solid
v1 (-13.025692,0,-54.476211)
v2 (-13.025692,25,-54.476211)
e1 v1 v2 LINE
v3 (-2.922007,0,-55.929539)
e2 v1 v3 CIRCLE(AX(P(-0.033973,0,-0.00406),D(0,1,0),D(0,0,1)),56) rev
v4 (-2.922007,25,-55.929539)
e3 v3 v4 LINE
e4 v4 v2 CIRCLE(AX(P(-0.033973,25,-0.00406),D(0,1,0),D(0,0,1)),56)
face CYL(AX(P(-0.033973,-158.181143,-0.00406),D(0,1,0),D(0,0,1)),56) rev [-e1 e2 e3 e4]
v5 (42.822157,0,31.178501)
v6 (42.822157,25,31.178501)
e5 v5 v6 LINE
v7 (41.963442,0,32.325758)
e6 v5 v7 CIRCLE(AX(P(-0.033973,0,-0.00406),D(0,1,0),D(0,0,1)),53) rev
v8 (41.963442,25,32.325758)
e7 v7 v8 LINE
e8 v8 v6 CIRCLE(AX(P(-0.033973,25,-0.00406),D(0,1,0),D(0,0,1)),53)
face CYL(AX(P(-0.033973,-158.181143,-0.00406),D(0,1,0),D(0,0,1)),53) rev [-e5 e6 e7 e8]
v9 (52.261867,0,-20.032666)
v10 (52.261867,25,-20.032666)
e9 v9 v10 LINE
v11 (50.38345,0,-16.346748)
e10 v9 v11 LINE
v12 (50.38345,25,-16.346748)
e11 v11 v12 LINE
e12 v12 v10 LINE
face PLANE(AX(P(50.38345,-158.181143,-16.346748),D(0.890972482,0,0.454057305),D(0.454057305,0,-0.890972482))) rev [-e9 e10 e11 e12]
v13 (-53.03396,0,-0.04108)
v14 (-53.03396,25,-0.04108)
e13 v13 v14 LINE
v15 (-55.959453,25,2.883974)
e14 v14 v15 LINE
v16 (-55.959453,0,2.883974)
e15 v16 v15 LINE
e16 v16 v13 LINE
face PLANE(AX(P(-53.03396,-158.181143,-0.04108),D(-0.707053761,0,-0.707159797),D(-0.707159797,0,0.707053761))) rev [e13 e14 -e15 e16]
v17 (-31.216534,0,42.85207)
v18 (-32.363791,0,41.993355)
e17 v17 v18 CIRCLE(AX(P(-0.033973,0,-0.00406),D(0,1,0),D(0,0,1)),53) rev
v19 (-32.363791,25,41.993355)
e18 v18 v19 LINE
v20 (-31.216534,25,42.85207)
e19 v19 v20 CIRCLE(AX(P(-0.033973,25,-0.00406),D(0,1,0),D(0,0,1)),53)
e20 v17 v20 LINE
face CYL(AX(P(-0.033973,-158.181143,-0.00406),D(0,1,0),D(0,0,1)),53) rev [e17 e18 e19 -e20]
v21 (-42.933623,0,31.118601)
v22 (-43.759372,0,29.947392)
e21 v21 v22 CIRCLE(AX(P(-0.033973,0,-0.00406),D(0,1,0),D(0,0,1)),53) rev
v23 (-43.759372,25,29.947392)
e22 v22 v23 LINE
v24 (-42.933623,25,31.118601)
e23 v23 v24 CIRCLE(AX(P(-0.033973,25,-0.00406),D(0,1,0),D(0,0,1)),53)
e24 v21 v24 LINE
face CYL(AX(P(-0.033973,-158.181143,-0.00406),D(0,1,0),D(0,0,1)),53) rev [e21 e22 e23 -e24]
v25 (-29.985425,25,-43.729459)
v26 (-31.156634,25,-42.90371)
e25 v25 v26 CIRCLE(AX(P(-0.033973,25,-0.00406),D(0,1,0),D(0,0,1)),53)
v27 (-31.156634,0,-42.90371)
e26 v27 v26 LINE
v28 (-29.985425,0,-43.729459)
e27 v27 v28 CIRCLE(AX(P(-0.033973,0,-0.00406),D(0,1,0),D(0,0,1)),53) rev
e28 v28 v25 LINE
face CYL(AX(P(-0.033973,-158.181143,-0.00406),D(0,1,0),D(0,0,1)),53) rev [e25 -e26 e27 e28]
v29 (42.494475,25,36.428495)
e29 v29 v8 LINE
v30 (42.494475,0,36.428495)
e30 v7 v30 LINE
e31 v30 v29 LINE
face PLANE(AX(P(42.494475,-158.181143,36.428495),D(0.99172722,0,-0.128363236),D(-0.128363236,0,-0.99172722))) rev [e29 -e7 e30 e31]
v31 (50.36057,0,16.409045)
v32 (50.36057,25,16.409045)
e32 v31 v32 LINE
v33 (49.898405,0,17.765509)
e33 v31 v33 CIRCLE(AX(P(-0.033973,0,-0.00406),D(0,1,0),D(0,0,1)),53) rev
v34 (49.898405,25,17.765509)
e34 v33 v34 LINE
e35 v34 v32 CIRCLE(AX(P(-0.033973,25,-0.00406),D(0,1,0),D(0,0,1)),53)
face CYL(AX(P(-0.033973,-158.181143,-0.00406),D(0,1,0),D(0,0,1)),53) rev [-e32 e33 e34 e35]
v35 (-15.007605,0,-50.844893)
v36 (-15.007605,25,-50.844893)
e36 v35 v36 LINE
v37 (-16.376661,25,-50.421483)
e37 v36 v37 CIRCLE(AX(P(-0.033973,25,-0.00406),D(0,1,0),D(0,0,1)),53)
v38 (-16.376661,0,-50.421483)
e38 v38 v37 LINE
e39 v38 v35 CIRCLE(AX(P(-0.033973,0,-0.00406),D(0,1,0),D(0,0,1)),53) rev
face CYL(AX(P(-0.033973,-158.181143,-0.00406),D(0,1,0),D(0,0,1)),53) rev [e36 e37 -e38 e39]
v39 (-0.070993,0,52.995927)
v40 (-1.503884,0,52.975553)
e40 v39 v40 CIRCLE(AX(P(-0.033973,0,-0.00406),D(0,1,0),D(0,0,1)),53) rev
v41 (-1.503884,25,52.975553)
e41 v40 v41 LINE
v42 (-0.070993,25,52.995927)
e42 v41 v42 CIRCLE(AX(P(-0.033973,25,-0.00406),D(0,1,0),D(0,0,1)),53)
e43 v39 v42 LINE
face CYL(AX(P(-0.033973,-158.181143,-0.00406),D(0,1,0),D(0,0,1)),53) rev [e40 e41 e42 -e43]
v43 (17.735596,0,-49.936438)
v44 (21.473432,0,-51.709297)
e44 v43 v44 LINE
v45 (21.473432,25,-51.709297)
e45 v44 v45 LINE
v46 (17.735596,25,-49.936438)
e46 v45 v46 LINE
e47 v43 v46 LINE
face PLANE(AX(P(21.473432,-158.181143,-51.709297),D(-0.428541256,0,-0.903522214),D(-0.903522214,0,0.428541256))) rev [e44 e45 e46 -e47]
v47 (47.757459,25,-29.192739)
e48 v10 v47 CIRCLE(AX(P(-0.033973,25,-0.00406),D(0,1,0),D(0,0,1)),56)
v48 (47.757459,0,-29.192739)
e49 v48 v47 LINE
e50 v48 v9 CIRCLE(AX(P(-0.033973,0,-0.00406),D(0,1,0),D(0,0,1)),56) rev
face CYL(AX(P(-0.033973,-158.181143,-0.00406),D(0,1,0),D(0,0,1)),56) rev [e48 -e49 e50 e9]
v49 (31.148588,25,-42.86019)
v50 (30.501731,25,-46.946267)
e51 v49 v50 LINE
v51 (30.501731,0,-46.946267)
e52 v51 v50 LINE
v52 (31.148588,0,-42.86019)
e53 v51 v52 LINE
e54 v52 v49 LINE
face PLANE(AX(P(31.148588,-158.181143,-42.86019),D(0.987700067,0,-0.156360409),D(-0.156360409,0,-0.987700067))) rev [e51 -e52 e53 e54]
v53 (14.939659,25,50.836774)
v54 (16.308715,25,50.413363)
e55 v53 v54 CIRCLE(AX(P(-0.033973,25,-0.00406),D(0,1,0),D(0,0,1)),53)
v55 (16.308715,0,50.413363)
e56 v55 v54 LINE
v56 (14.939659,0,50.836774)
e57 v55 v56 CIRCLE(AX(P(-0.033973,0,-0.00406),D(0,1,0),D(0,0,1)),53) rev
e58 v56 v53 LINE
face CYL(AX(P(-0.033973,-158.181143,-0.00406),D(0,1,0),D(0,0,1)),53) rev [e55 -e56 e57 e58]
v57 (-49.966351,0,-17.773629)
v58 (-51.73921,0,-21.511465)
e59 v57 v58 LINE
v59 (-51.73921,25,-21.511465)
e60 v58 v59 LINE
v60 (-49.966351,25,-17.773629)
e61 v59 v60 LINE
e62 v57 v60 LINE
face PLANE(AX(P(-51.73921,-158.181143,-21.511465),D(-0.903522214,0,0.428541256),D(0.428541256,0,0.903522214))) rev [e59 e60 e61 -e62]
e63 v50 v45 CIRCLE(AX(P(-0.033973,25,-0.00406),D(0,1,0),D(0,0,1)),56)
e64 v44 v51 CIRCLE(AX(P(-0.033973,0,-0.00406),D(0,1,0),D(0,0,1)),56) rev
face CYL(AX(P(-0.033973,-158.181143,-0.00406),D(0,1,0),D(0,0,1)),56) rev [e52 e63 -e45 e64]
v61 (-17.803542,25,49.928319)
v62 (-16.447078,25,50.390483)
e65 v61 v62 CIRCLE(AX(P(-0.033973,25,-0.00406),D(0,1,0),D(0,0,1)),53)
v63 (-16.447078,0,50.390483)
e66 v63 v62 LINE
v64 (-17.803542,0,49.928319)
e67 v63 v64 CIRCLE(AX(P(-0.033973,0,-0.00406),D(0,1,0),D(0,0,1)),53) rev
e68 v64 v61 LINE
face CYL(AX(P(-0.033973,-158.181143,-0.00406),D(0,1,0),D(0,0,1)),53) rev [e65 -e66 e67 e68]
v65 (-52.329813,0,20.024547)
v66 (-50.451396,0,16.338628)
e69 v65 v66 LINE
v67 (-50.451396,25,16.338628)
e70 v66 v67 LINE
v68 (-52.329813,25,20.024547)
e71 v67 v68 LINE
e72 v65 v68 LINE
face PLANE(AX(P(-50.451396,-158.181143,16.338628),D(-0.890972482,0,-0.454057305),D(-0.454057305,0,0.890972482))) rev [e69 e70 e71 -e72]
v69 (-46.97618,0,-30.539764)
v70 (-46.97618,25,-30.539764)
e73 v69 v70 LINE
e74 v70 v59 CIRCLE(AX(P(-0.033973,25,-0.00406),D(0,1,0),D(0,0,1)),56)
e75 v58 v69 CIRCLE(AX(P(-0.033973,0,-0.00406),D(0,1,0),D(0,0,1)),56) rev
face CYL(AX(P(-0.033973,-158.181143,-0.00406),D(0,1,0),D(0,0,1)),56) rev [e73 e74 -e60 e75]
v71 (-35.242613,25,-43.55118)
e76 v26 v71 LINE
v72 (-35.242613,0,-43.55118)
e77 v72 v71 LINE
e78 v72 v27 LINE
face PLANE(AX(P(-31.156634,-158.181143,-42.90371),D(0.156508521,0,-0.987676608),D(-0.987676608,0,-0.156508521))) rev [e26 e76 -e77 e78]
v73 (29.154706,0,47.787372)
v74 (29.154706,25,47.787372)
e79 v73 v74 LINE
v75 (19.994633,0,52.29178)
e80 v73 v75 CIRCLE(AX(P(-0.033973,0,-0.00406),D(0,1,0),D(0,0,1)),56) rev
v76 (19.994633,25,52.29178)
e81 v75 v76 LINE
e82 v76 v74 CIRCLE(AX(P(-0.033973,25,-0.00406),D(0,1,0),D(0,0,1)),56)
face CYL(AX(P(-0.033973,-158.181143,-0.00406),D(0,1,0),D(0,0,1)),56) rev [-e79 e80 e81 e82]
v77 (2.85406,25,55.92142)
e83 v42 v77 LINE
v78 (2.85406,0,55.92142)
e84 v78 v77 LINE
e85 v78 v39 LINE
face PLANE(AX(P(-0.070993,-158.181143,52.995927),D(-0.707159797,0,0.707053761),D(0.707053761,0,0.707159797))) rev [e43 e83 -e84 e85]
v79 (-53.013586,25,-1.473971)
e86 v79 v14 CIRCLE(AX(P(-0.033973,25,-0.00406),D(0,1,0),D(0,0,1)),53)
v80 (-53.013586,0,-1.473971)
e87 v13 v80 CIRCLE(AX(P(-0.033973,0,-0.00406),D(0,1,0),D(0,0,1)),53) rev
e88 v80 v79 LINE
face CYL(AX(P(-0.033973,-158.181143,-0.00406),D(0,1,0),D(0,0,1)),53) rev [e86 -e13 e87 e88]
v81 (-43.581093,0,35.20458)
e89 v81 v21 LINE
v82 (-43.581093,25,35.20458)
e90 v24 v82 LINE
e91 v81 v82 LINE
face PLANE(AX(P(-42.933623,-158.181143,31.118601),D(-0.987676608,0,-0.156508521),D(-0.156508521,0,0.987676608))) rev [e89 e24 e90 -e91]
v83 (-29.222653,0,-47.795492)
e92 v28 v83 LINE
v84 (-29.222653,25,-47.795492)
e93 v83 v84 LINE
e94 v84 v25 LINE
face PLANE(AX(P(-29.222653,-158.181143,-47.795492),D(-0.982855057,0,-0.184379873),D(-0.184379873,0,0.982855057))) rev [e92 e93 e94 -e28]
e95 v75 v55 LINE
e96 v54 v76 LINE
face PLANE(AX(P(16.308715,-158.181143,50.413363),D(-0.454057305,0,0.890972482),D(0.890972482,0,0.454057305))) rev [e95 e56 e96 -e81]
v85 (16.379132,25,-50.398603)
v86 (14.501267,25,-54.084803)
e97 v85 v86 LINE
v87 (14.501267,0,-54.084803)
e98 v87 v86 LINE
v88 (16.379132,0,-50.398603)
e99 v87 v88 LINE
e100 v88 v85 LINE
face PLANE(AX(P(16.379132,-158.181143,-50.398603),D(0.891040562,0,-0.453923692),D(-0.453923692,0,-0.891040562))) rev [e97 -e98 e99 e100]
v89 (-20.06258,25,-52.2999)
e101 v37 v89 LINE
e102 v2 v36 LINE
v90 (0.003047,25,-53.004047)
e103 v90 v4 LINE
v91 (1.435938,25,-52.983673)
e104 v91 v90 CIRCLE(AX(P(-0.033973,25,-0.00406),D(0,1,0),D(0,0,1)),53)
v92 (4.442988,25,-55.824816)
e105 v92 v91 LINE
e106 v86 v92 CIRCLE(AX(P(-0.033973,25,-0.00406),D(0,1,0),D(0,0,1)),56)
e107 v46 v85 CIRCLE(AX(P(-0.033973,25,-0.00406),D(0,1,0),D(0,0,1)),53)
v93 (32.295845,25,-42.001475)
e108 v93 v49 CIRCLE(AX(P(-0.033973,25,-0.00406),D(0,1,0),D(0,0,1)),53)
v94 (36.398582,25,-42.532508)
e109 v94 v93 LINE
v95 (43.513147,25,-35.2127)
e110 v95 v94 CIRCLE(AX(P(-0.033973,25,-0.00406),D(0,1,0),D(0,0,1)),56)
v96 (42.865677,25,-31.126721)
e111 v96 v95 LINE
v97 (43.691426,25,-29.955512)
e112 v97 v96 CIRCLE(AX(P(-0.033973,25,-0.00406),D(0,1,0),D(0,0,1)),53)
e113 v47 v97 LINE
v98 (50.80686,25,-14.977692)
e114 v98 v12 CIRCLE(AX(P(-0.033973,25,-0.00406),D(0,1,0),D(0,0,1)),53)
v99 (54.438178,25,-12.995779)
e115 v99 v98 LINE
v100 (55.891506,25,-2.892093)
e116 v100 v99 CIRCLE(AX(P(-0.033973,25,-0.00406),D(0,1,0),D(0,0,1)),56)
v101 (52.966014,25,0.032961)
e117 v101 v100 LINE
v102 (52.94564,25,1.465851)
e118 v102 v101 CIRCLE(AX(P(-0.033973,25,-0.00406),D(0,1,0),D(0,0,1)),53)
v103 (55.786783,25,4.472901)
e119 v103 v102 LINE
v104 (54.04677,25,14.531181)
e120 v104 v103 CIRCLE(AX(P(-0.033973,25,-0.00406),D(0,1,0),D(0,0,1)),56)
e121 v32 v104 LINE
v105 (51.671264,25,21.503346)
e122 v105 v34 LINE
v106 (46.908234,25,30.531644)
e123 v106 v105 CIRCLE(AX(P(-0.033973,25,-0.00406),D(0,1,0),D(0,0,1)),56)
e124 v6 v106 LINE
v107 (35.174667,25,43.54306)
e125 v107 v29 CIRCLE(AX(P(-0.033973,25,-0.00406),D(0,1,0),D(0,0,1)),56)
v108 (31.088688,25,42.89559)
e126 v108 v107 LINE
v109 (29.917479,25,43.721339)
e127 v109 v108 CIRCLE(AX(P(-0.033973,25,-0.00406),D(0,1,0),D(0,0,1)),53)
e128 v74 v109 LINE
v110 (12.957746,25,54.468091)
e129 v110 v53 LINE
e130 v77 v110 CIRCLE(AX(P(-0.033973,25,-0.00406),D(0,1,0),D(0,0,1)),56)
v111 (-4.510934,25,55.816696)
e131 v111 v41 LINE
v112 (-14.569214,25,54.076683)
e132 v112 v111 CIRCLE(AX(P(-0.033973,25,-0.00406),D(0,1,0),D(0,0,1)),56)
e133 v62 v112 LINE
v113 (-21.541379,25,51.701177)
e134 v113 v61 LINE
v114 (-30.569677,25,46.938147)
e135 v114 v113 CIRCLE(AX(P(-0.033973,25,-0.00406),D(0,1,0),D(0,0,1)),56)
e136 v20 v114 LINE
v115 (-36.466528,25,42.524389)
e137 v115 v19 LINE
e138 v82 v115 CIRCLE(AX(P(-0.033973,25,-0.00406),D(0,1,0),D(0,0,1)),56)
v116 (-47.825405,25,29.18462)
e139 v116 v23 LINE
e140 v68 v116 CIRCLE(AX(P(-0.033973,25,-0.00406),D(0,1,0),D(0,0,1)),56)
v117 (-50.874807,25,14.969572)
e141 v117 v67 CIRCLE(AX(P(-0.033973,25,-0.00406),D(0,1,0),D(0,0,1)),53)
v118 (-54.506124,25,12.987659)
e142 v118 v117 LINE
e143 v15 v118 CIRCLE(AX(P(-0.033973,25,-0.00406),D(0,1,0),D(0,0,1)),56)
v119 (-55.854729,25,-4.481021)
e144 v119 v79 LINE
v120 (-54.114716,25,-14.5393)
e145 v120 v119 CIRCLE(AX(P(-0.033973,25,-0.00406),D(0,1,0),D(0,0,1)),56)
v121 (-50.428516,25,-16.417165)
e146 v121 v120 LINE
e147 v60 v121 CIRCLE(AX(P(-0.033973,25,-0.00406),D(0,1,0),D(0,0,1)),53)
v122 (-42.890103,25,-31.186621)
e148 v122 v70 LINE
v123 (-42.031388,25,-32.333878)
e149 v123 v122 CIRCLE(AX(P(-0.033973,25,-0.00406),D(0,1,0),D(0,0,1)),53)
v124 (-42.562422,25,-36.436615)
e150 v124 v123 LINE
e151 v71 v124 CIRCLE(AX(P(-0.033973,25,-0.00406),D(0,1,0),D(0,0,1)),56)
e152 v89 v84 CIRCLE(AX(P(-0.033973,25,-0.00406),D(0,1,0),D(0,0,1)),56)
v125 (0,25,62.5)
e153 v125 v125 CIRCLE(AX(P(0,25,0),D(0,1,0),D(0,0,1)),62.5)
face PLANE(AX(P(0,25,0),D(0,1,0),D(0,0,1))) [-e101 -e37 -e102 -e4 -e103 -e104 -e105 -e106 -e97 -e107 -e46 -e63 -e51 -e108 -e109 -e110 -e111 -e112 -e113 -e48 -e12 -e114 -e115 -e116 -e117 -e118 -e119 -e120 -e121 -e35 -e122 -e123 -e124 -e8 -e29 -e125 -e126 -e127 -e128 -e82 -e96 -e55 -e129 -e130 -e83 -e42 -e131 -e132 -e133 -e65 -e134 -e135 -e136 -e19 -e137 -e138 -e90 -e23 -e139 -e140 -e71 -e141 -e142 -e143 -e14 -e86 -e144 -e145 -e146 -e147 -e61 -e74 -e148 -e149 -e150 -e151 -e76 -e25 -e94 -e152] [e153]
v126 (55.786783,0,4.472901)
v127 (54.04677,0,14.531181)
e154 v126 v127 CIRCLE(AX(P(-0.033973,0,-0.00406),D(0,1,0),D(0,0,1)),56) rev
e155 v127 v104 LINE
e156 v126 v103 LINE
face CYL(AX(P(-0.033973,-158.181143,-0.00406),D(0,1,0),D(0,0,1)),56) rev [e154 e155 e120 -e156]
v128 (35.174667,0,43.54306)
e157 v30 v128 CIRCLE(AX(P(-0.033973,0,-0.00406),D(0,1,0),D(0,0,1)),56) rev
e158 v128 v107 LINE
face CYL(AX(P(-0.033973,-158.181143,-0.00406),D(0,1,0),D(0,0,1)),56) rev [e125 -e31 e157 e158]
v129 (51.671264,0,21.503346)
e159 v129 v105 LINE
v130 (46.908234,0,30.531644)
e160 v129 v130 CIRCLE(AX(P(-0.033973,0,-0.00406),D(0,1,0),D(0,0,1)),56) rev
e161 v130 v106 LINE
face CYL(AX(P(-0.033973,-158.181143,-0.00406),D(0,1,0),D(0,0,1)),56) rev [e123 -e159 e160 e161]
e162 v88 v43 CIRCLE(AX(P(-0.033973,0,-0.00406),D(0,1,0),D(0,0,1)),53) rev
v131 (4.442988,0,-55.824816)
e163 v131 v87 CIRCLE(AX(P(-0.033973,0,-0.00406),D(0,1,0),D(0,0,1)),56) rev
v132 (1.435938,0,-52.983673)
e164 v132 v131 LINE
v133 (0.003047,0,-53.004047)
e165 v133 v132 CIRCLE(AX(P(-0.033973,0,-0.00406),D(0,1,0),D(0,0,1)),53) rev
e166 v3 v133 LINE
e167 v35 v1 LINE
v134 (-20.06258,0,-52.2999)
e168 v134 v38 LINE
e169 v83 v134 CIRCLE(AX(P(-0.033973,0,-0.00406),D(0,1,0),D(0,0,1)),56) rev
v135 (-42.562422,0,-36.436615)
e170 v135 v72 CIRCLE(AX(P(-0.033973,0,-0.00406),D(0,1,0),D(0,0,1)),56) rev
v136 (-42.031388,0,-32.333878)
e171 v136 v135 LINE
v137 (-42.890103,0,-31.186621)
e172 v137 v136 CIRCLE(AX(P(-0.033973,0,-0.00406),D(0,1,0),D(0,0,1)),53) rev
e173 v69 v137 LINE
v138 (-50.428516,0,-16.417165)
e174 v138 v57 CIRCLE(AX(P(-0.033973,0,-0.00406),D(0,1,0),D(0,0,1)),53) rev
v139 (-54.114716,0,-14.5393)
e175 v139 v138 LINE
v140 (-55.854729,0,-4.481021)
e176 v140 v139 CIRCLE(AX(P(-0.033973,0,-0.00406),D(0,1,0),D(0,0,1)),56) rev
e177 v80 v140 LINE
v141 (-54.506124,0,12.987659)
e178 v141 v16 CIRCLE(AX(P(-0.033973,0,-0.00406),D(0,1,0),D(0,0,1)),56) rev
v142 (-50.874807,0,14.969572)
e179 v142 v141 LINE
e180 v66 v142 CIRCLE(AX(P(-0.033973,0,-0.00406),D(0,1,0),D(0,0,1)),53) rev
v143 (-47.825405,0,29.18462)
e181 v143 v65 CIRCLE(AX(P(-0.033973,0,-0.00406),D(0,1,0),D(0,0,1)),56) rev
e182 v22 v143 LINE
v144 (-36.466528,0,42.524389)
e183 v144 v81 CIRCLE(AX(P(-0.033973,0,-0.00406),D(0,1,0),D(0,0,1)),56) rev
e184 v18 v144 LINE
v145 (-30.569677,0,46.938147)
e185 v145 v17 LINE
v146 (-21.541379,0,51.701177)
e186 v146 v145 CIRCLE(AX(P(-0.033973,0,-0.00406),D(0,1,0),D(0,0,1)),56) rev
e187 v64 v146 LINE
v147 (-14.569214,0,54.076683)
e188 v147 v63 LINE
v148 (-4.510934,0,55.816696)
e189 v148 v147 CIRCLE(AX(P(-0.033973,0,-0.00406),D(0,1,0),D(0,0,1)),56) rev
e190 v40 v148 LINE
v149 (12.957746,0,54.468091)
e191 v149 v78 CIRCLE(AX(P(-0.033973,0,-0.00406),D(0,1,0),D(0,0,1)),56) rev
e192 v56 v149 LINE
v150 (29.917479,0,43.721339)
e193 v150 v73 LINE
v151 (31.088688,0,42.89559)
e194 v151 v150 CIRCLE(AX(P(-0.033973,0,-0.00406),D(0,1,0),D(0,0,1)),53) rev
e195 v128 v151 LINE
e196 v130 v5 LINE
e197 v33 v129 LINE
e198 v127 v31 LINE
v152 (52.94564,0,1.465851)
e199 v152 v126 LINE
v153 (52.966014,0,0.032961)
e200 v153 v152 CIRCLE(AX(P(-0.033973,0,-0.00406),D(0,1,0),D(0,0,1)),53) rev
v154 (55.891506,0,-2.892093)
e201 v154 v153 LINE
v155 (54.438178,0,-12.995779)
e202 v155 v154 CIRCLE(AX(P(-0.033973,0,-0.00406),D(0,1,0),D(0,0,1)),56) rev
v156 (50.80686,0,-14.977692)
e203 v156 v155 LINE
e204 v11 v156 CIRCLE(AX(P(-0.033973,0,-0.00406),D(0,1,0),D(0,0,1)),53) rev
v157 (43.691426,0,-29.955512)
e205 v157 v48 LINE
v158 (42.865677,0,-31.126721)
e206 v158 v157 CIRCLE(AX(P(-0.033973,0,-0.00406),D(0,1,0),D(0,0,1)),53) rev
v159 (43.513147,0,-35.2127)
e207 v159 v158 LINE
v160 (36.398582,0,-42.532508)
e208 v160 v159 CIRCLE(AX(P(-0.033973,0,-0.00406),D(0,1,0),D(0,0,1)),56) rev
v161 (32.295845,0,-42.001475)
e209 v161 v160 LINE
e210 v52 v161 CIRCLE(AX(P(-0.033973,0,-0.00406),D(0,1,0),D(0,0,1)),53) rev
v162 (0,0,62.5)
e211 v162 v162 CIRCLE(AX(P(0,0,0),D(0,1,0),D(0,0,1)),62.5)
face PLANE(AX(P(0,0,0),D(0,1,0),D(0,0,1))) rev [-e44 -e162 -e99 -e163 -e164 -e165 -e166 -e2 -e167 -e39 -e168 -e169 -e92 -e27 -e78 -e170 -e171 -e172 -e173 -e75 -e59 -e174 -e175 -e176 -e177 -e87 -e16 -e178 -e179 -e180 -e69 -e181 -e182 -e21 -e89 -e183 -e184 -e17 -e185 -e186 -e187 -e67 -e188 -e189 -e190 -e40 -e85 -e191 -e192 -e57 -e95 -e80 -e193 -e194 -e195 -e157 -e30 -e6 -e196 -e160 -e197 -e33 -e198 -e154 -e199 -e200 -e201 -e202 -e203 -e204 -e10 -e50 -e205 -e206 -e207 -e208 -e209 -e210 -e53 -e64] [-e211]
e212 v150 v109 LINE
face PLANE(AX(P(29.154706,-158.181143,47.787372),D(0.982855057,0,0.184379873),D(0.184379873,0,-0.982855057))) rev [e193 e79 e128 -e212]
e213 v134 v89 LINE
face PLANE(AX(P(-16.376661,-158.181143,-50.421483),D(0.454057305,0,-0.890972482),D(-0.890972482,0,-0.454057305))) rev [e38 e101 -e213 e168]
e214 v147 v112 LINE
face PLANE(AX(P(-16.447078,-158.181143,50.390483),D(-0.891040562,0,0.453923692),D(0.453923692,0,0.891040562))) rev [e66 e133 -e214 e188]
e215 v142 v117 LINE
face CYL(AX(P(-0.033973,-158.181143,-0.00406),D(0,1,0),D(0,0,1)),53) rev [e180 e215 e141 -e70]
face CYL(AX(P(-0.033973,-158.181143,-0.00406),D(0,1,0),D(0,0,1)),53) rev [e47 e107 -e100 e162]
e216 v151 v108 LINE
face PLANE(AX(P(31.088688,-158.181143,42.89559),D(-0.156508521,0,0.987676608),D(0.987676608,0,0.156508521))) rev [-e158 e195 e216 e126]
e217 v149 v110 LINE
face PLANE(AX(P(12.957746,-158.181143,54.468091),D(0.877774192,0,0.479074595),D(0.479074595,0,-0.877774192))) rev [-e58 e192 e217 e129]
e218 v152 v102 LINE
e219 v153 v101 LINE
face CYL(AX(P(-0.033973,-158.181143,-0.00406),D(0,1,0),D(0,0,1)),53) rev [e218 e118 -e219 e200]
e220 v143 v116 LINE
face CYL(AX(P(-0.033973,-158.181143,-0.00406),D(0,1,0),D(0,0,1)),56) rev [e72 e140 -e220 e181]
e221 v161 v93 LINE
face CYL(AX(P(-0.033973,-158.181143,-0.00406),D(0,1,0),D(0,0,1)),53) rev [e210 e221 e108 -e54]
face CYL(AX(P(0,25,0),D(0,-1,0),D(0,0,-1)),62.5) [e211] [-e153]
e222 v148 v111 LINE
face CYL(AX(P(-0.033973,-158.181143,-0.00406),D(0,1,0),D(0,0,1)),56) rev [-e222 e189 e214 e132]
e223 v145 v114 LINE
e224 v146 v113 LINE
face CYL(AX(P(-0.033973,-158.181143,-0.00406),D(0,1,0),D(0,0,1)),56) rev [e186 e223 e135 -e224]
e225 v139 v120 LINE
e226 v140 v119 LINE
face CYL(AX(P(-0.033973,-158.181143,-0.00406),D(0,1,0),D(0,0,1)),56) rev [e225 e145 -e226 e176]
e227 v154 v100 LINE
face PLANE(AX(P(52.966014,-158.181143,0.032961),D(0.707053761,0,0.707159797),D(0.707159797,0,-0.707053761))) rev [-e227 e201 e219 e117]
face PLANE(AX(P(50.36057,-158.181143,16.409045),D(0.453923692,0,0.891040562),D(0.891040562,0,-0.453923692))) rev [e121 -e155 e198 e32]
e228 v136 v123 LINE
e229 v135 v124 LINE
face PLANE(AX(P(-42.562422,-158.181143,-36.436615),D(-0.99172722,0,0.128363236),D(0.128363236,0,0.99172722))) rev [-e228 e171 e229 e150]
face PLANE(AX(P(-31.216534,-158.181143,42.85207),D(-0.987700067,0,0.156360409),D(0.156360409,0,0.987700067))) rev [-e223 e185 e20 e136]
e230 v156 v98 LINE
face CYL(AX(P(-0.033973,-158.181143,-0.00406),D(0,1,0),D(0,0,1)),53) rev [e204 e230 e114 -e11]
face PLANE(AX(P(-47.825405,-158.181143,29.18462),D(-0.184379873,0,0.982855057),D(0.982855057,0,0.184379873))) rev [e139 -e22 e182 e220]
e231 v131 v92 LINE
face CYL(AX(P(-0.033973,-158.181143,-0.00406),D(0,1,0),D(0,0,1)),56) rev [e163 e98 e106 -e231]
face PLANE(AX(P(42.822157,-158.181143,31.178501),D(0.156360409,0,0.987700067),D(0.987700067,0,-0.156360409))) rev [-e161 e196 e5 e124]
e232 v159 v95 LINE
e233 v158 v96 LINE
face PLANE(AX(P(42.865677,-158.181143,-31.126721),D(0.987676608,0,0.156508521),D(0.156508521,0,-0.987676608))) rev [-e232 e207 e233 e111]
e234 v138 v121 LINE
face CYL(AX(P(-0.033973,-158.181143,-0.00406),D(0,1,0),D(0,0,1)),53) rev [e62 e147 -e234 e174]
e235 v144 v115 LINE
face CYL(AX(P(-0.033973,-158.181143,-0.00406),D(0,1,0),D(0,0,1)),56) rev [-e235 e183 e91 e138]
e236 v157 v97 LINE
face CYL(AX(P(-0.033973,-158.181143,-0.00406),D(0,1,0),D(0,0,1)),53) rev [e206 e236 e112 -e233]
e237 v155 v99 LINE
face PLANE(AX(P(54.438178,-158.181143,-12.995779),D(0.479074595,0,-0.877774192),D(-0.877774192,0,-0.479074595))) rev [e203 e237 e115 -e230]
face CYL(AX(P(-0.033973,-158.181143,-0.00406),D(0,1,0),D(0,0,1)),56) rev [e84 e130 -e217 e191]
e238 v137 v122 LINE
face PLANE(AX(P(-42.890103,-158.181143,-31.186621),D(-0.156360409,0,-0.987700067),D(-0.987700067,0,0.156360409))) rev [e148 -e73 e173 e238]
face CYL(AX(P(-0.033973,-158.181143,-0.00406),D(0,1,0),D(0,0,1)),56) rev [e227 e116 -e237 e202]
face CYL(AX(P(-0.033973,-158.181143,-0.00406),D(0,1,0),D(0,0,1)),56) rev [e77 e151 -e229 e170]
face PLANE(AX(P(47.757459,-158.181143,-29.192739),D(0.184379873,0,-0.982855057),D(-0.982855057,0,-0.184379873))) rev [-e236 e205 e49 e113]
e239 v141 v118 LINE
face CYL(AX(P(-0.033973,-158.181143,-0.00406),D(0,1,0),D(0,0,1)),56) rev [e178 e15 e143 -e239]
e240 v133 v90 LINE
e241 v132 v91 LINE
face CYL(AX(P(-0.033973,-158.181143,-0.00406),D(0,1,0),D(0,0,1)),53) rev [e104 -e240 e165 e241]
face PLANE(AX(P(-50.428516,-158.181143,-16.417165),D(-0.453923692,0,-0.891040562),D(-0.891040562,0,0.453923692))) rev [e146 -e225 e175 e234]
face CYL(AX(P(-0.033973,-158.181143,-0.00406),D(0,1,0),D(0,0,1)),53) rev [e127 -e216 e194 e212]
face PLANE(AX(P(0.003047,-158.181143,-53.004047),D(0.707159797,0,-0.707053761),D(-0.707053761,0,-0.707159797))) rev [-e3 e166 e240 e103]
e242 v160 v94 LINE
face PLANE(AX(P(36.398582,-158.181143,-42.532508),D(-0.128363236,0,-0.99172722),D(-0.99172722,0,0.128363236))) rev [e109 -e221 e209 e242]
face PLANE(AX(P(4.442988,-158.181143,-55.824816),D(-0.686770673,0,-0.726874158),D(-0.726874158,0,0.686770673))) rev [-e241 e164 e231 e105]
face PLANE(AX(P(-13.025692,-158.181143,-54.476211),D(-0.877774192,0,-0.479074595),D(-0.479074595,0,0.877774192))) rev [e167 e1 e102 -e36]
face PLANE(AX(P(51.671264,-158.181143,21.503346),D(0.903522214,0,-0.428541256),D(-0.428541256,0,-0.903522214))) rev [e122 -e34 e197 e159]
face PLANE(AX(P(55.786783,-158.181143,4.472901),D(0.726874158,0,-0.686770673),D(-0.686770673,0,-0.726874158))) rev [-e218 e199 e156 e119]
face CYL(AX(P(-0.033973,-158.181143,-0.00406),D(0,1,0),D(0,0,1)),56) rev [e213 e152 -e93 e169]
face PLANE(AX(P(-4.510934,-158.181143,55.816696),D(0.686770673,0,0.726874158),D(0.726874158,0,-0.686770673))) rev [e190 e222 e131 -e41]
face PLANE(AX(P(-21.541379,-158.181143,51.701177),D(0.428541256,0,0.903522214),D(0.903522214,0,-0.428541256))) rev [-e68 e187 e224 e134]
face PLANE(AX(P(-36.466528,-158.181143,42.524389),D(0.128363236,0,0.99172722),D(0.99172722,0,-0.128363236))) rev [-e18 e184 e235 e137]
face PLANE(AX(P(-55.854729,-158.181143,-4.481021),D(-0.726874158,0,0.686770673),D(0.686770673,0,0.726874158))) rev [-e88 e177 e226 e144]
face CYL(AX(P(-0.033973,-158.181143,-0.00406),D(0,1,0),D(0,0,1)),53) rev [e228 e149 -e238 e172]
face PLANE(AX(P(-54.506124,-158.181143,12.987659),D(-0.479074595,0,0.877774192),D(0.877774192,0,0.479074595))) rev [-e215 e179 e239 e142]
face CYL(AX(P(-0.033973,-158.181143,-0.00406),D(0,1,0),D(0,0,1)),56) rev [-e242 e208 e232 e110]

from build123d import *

# Parameters (mm, degrees)
SKETCH1_R           = 62.5
BOSS_EXTRUDE1_DEPTH = 25
CAVITY1_DEPTH       = 25
CUT_EXTRUDE1_DEPTH  = 25


# Read off the part's stored shape, not the designer's step: Cavity1
with BuildPart() as part:
    # Sketch1 → Boss-Extrude1 (new body)
    with BuildSketch(Plane(origin=(0, 0, 0), x_dir=(1, 0, 0), z_dir=(0, 1, 0))):
        with Locations(Location((0, 0, 0), (0, 0, 270))):
            Circle(SKETCH1_R)
    extrude(amount=BOSS_EXTRUDE1_DEPTH)

    # Cavity1 outline → Cavity1 (cut)
    with BuildSketch(Plane(origin=(0, 0, 0), x_dir=(1, 0, 0), z_dir=(0, 1, 0))):
        with BuildLine():
            Line((16.350867892, -49.873660473), (20.022970331, -51.745036944))
            ThreePointArc((20.022970331, -51.745036944), (24.456878574, -49.800038203), (28.704396647, -47.476000203))
            Line((28.704396647, -47.476000203), (29.464309883, -43.425207924))
            ThreePointArc((29.464309883, -43.425207924), (30.217762384, -42.903777412), (30.961999914, -42.369276757))
            Line((30.961999914, -42.369276757), (35.032663999, -43.014319485))
            ThreePointArc((35.032663999, -43.014319485), (38.648523661, -39.79436276), (41.969986165, -36.271516008))
            Line((41.969986165, -36.271516008), (41.440942946, -32.18415751))
            ThreePointArc((41.440942946, -32.18415751), (41.996387967, -31.455417996), (42.539030133, -30.717095621))
            Line((42.539030133, -30.717095621), (46.609790903, -30.07266333))
            ThreePointArc((46.609790903, -30.07266333), (49.053656447, -25.89294042), (51.12393549, -21.5161257))
            Line((51.12393549, -21.5161257), (49.357722251, -17.792300112))
            ThreePointArc((49.357722251, -17.792300112), (49.660788964, -16.927585698), (49.94871817, -16.05771374))
            Line((49.94871817, -16.05771374), (53.621101197, -14.186887953))
            ThreePointArc((53.621101197, -14.186887953), (54.653750036, -9.456539258), (55.270192281, -4.654189691))
            Line((55.270192281, -4.654189691), (52.43969828, -1.658411006))
            ThreePointArc((52.43969828, -1.658411006), (52.460720403, -0.742365963), (52.465752134, 0.173906448))
            Line((52.465752134, 0.173906448), (55.380278979, 3.087996269))
            ThreePointArc((55.380278979, 3.087996269), (54.900628251, 7.905931261), (54.002892036, 12.66372824))
            Line((54.002892036, 12.66372824), (50.385185747, 14.63821233))
            ThreePointArc((50.385185747, 14.63821233), (50.122105488, 15.515919131), (49.843747202, 16.388900869))
            Line((49.843747202, 16.388900869), (51.715123672, 20.061003308))
            ThreePointArc((51.715123672, 20.061003308), (49.770124931, 24.49491155), (47.446086932, 28.742429624))
            Line((47.446086932, 28.742429624), (43.395294653, 29.50234286))
            ThreePointArc((43.395294653, 29.50234286), (42.87386414, 30.255795361), (42.339363485, 31.000032891))
            Line((42.339363485, 31.000032891), (42.984406214, 35.070696976))
            ThreePointArc((42.984406214, 35.070696976), (39.764449489, 38.686556638), (36.241602736, 42.008019142))
            Line((36.241602736, 42.008019142), (32.154244239, 41.478975923))
            ThreePointArc((32.154244239, 41.478975923), (31.425504725, 42.034420944), (30.68718235, 42.57706311))
            Line((30.68718235, 42.57706311), (30.042750059, 46.64782388))
            ThreePointArc((30.042750059, 46.64782388), (25.863027148, 49.091689424), (21.486212429, 51.161968467))
            Line((21.486212429, 51.161968467), (17.762386841, 49.395755228))
            ThreePointArc((17.762386841, 49.395755228), (16.897672427, 49.698821941), (16.027800469, 49.986751147))
            Line((16.027800469, 49.986751147), (14.156974682, 53.659134174))
            ThreePointArc((14.156974682, 53.659134174), (9.426625987, 54.691783013), (4.62427642, 55.308225258))
            Line((4.62427642, 55.308225258), (1.628497735, 52.477731257))
            ThreePointArc((1.628497735, 52.477731257), (0.712452692, 52.49875338), (-0.20381972, 52.503785111))
            Line((-0.20381972, 52.503785111), (-3.11790954, 55.418311956))
            ThreePointArc((-3.11790954, 55.418311956), (-7.935844532, 54.938661228), (-12.693641511, 54.040925013))
            Line((-12.693641511, 54.040925013), (-14.668125602, 50.423218724))
            ThreePointArc((-14.668125602, 50.423218724), (-15.545832402, 50.160138465), (-16.41881414, 49.881780179))
            Line((-16.41881414, 49.881780179), (-20.090916579, 51.753156649))
            ThreePointArc((-20.090916579, 51.753156649), (-24.524824822, 49.808157908), (-28.772342895, 47.484119909))
            Line((-28.772342895, 47.484119909), (-29.532256132, 43.43332763))
            ThreePointArc((-29.532256132, 43.43332763), (-30.285708633, 42.911897117), (-31.029946162, 42.377396462))
            Line((-31.029946162, 42.377396462), (-35.100610248, 43.022439191))
            ThreePointArc((-35.100610248, 43.022439191), (-38.71646991, 39.802482465), (-42.037932414, 36.279635713))
            Line((-42.037932414, 36.279635713), (-41.508889194, 32.192277216))
            ThreePointArc((-41.508889194, 32.192277216), (-42.064334215, 31.463537702), (-42.606976382, 30.725215327))
            Line((-42.606976382, 30.725215327), (-46.677737151, 30.080783036))
            ThreePointArc((-46.677737151, 30.080783036), (-49.121602695, 25.901060125), (-51.191881738, 21.524245406))
            Line((-51.191881738, 21.524245406), (-49.425668499, 17.800419818))
            ThreePointArc((-49.425668499, 17.800419818), (-49.728735212, 16.935705404), (-50.016664419, 16.065833446))
            Line((-50.016664419, 16.065833446), (-53.689047445, 14.195007659))
            ThreePointArc((-53.689047445, 14.195007659), (-54.721696284, 9.464658964), (-55.33813853, 4.662309397))
            Line((-55.33813853, 4.662309397), (-52.507644528, 1.666530712))
            ThreePointArc((-52.507644528, 1.666530712), (-52.528666651, 0.750485669), (-52.533698382, -0.165786743))
            Line((-52.533698382, -0.165786743), (-55.448225228, -3.079876563))
            ThreePointArc((-55.448225228, -3.079876563), (-54.968574499, -7.897811555), (-54.070838284, -12.655608534))
            Line((-54.070838284, -12.655608534), (-50.453131995, -14.630092625))
            ThreePointArc((-50.453131995, -14.630092625), (-50.190051736, -15.507799425), (-49.91169345, -16.380781163))
            Line((-49.91169345, -16.380781163), (-51.783069921, -20.052883602))
            ThreePointArc((-51.783069921, -20.052883602), (-49.83807118, -24.486791845), (-47.51403318, -28.734309918))
            Line((-47.51403318, -28.734309918), (-43.463240901, -29.494223155))
            ThreePointArc((-43.463240901, -29.494223155), (-42.941810389, -30.247675656), (-42.407309734, -30.991913185))
            Line((-42.407309734, -30.991913185), (-43.052352462, -35.062577271))
            ThreePointArc((-43.052352462, -35.062577271), (-39.832395737, -38.678436932), (-36.309548985, -41.999899437))
            Line((-36.309548985, -41.999899437), (-32.222190487, -41.470856217))
            ThreePointArc((-32.222190487, -41.470856217), (-31.493450973, -42.026301238), (-30.755128598, -42.568943405))
            Line((-30.755128598, -42.568943405), (-30.110696307, -46.639704174))
            ThreePointArc((-30.110696307, -46.639704174), (-25.930973397, -49.083569718), (-21.554158677, -51.153848761))
            Line((-21.554158677, -51.153848761), (-17.830333089, -49.387635522))
            ThreePointArc((-17.830333089, -49.387635522), (-16.965618675, -49.690702235), (-16.095746717, -49.978631442))
            Line((-16.095746717, -49.978631442), (-14.22492093, -53.651014468))
            ThreePointArc((-14.22492093, -53.651014468), (-9.494572235, -54.683663307), (-4.692222668, -55.300105553))
            Line((-4.692222668, -55.300105553), (-1.696443983, -52.469611551))
            ThreePointArc((-1.696443983, -52.469611551), (-0.78039894, -52.490633674), (0.135873471, -52.495665405))
            Line((0.135873471, -52.495665405), (3.049963292, -55.410192251))
            ThreePointArc((3.049963292, -55.410192251), (7.867898284, -54.930541522), (12.625695263, -54.032805307))
            Line((12.625695263, -54.032805307), (14.600179353, -50.415099018))
            ThreePointArc((14.600179353, -50.415099018), (15.477886154, -50.152018759), (16.350867892, -49.873660473))
        make_face()
    extrude(amount=CAVITY1_DEPTH, mode=Mode.SUBTRACT)

    # Sketch2 → Cut-Extrude1 (cut)
    with BuildSketch(Plane(origin=(0, 25, 0), x_dir=(1, 0, 0), z_dir=(0, 1, 0))):
        with BuildLine():
            Line((-13.025692309, 54.476210835), (-15.00760521, 50.844893266))
            ThreePointArc((-15.00760521, 50.844893266), (-15.693564395, 50.637815404), (-16.376661363, 50.421482845))
            Line((-16.376661363, 50.421482845), (-20.062579743, 52.299900193))
            ThreePointArc((-20.062579743, 52.299900193), (-24.745463125, 50.256843477), (-29.222652686, 47.795491987))
            Line((-29.222652686, 47.795491987), (-29.985425025, 43.729458982))
            ThreePointArc((-29.985425025, 43.729458982), (-30.573820399, 43.320543187), (-31.156633785, 42.903710124))
            Line((-31.156633785, 42.903710124), (-35.242613361, 43.551179765))
            ThreePointArc((-35.242613361, 43.551179765), (-39.064960871, 40.161026813), (-42.562421739, 36.436614779))
            Line((-42.562421739, 36.436614779), (-42.031388044, 32.333877979))
            ThreePointArc((-42.031388044, 32.333877979), (-42.464623369, 31.763151777), (-42.890103336, 31.186620736))
            Line((-42.890103336, 31.186620736), (-46.976179961, 30.539763829))
            ThreePointArc((-46.976179961, 30.539763829), (-49.563833592, 26.134366434), (-51.739209928, 21.511465254))
            Line((-51.739209928, 21.511465254), (-49.966351477, 17.773629122))
            ThreePointArc((-49.966351477, 17.773629122), (-50.20201866, 17.096959171), (-50.428516267, 16.417165027))
            Line((-50.428516267, 16.417165027), (-54.114716289, 14.539300433))
            ThreePointArc((-54.114716289, 14.539300433), (-55.214378475, 9.549889586), (-55.854729287, 4.481021038))
            Line((-55.854729287, 4.481021038), (-53.013585818, 1.473971017))
            ThreePointArc((-53.013585818, 1.473971017), (-53.028616113, 0.757594486), (-53.033960195, 0.041080226))
            Line((-53.033960195, 0.041080226), (-55.959452674, -2.883973584))
            ThreePointArc((-55.959452674, -2.883973584), (-55.463480818, -7.968999586), (-54.506124106, -12.987659332))
            Line((-54.506124106, -12.987659332), (-50.874806537, -14.969572233))
            ThreePointArc((-50.874806537, -14.969572233), (-50.667728675, -15.655531418), (-50.451396116, -16.338628386))
            Line((-50.451396116, -16.338628386), (-52.329813465, -20.024546766))
            ThreePointArc((-52.329813465, -20.024546766), (-50.286756748, -24.707430148), (-47.825405258, -29.184619709))
            Line((-47.825405258, -29.184619709), (-43.759372253, -29.947392048))
            ThreePointArc((-43.759372253, -29.947392048), (-43.350456458, -30.535787422), (-42.933623395, -31.118600808))
            Line((-42.933623395, -31.118600808), (-43.581093036, -35.204580384))
            ThreePointArc((-43.581093036, -35.204580384), (-40.190940085, -39.026927894), (-36.46652805, -42.524388762))
            Line((-36.46652805, -42.524388762), (-32.36379125, -41.993355067))
            ThreePointArc((-32.36379125, -41.993355067), (-31.793065048, -42.426590392), (-31.216534007, -42.852070359))
            Line((-31.216534007, -42.852070359), (-30.5696771, -46.938146984))
            ThreePointArc((-30.5696771, -46.938146984), (-26.164279705, -49.525800615), (-21.541378525, -51.701176951))
            Line((-21.541378525, -51.701176951), (-17.803542393, -49.9283185))
            ThreePointArc((-17.803542393, -49.9283185), (-17.126872442, -50.163985683), (-16.447078298, -50.39048329))
            Line((-16.447078298, -50.39048329), (-14.569213704, -54.076683312))
            ThreePointArc((-14.569213704, -54.076683312), (-9.579802857, -55.176345498), (-4.510934309, -55.81669631))
            Line((-4.510934309, -55.81669631), (-1.503884289, -52.975552841))
            ThreePointArc((-1.503884289, -52.975552841), (-0.787507757, -52.990583136), (-0.070993497, -52.995927218))
            Line((-0.070993497, -52.995927218), (2.854060312, -55.921419697))
            ThreePointArc((2.854060312, -55.921419697), (7.939086314, -55.425447841), (12.957746061, -54.468091129))
            Line((12.957746061, -54.468091129), (14.939658962, -50.83677356))
            ThreePointArc((14.939658962, -50.83677356), (15.625618147, -50.629695698), (16.308715115, -50.413363139))
            Line((16.308715115, -50.413363139), (19.994633494, -52.291780488))
            ThreePointArc((19.994633494, -52.291780488), (24.677516877, -50.248723771), (29.154706438, -47.787372281))
            Line((29.154706438, -47.787372281), (29.917478777, -43.721339276))
            ThreePointArc((29.917478777, -43.721339276), (30.505874151, -43.312423481), (31.088687537, -42.895590418))
            Line((31.088687537, -42.895590418), (35.174667113, -43.543060059))
            ThreePointArc((35.174667113, -43.543060059), (38.997014623, -40.152907108), (42.494475491, -36.428495073))
            Line((42.494475491, -36.428495073), (41.963441796, -32.325758273))
            ThreePointArc((41.963441796, -32.325758273), (42.39667712, -31.755032071), (42.822157088, -31.17850103))
            Line((42.822157088, -31.17850103), (46.908233712, -30.531644123))
            ThreePointArc((46.908233712, -30.531644123), (49.495887344, -26.126246728), (51.671263679, -21.503345548))
            Line((51.671263679, -21.503345548), (49.898405229, -17.765509416))
            ThreePointArc((49.898405229, -17.765509416), (50.134072412, -17.088839465), (50.360570019, -16.409045321))
            Line((50.360570019, -16.409045321), (54.046770041, -14.531180727))
            ThreePointArc((54.046770041, -14.531180727), (55.146432227, -9.54176988), (55.786783038, -4.472901332))
            Line((55.786783038, -4.472901332), (52.94563957, -1.465851312))
            ThreePointArc((52.94563957, -1.465851312), (52.960669865, -0.74947478), (52.966013947, -0.03296052))
            Line((52.966013947, -0.03296052), (55.891506426, 2.892093289))
            ThreePointArc((55.891506426, 2.892093289), (55.39553457, 7.977119292), (54.438177858, 12.995779038))
            Line((54.438177858, 12.995779038), (50.806860289, 14.977691939))
            ThreePointArc((50.806860289, 14.977691939), (50.599782427, 15.663651124), (50.383449868, 16.346748092))
            Line((50.383449868, 16.346748092), (52.261867216, 20.032666471))
            ThreePointArc((52.261867216, 20.032666471), (50.2188105, 24.715549854), (47.75745901, 29.192739415))
            Line((47.75745901, 29.192739415), (43.691426005, 29.955511754))
            ThreePointArc((43.691426005, 29.955511754), (43.28251021, 30.543907128), (42.865677147, 31.126720514))
            Line((42.865677147, 31.126720514), (43.513146788, 35.21270009))
            ThreePointArc((43.513146788, 35.21270009), (40.122993836, 39.0350476), (36.398581802, 42.532508468))
            Line((36.398581802, 42.532508468), (32.295845002, 42.001474773))
            ThreePointArc((32.295845002, 42.001474773), (31.7251188, 42.434710097), (31.148587759, 42.860190065))
            Line((31.148587759, 42.860190065), (30.501730852, 46.946266689))
            ThreePointArc((30.501730852, 46.946266689), (26.096333457, 49.533920321), (21.473432277, 51.709296656))
            Line((21.473432277, 51.709296656), (17.735596145, 49.936438206))
            ThreePointArc((17.735596145, 49.936438206), (17.058926194, 50.172105389), (16.37913205, 50.398602996))
            Line((16.37913205, 50.398602996), (14.501267456, 54.084803018))
            ThreePointArc((14.501267456, 54.084803018), (9.511856609, 55.184465204), (4.442988061, 55.824816015))
            Line((4.442988061, 55.824816015), (1.43593804, 52.983672547))
            ThreePointArc((1.43593804, 52.983672547), (0.719561509, 52.998702842), (0.003047249, 53.004046924))
            Line((0.003047249, 53.004046924), (-2.922006561, 55.929539403))
            ThreePointArc((-2.922006561, 55.929539403), (-8.007032563, 55.433567547), (-13.025692309, 54.476210835))
        make_face()
    extrude(amount=-CUT_EXTRUDE1_DEPTH, mode=Mode.SUBTRACT)


solid = part.part
